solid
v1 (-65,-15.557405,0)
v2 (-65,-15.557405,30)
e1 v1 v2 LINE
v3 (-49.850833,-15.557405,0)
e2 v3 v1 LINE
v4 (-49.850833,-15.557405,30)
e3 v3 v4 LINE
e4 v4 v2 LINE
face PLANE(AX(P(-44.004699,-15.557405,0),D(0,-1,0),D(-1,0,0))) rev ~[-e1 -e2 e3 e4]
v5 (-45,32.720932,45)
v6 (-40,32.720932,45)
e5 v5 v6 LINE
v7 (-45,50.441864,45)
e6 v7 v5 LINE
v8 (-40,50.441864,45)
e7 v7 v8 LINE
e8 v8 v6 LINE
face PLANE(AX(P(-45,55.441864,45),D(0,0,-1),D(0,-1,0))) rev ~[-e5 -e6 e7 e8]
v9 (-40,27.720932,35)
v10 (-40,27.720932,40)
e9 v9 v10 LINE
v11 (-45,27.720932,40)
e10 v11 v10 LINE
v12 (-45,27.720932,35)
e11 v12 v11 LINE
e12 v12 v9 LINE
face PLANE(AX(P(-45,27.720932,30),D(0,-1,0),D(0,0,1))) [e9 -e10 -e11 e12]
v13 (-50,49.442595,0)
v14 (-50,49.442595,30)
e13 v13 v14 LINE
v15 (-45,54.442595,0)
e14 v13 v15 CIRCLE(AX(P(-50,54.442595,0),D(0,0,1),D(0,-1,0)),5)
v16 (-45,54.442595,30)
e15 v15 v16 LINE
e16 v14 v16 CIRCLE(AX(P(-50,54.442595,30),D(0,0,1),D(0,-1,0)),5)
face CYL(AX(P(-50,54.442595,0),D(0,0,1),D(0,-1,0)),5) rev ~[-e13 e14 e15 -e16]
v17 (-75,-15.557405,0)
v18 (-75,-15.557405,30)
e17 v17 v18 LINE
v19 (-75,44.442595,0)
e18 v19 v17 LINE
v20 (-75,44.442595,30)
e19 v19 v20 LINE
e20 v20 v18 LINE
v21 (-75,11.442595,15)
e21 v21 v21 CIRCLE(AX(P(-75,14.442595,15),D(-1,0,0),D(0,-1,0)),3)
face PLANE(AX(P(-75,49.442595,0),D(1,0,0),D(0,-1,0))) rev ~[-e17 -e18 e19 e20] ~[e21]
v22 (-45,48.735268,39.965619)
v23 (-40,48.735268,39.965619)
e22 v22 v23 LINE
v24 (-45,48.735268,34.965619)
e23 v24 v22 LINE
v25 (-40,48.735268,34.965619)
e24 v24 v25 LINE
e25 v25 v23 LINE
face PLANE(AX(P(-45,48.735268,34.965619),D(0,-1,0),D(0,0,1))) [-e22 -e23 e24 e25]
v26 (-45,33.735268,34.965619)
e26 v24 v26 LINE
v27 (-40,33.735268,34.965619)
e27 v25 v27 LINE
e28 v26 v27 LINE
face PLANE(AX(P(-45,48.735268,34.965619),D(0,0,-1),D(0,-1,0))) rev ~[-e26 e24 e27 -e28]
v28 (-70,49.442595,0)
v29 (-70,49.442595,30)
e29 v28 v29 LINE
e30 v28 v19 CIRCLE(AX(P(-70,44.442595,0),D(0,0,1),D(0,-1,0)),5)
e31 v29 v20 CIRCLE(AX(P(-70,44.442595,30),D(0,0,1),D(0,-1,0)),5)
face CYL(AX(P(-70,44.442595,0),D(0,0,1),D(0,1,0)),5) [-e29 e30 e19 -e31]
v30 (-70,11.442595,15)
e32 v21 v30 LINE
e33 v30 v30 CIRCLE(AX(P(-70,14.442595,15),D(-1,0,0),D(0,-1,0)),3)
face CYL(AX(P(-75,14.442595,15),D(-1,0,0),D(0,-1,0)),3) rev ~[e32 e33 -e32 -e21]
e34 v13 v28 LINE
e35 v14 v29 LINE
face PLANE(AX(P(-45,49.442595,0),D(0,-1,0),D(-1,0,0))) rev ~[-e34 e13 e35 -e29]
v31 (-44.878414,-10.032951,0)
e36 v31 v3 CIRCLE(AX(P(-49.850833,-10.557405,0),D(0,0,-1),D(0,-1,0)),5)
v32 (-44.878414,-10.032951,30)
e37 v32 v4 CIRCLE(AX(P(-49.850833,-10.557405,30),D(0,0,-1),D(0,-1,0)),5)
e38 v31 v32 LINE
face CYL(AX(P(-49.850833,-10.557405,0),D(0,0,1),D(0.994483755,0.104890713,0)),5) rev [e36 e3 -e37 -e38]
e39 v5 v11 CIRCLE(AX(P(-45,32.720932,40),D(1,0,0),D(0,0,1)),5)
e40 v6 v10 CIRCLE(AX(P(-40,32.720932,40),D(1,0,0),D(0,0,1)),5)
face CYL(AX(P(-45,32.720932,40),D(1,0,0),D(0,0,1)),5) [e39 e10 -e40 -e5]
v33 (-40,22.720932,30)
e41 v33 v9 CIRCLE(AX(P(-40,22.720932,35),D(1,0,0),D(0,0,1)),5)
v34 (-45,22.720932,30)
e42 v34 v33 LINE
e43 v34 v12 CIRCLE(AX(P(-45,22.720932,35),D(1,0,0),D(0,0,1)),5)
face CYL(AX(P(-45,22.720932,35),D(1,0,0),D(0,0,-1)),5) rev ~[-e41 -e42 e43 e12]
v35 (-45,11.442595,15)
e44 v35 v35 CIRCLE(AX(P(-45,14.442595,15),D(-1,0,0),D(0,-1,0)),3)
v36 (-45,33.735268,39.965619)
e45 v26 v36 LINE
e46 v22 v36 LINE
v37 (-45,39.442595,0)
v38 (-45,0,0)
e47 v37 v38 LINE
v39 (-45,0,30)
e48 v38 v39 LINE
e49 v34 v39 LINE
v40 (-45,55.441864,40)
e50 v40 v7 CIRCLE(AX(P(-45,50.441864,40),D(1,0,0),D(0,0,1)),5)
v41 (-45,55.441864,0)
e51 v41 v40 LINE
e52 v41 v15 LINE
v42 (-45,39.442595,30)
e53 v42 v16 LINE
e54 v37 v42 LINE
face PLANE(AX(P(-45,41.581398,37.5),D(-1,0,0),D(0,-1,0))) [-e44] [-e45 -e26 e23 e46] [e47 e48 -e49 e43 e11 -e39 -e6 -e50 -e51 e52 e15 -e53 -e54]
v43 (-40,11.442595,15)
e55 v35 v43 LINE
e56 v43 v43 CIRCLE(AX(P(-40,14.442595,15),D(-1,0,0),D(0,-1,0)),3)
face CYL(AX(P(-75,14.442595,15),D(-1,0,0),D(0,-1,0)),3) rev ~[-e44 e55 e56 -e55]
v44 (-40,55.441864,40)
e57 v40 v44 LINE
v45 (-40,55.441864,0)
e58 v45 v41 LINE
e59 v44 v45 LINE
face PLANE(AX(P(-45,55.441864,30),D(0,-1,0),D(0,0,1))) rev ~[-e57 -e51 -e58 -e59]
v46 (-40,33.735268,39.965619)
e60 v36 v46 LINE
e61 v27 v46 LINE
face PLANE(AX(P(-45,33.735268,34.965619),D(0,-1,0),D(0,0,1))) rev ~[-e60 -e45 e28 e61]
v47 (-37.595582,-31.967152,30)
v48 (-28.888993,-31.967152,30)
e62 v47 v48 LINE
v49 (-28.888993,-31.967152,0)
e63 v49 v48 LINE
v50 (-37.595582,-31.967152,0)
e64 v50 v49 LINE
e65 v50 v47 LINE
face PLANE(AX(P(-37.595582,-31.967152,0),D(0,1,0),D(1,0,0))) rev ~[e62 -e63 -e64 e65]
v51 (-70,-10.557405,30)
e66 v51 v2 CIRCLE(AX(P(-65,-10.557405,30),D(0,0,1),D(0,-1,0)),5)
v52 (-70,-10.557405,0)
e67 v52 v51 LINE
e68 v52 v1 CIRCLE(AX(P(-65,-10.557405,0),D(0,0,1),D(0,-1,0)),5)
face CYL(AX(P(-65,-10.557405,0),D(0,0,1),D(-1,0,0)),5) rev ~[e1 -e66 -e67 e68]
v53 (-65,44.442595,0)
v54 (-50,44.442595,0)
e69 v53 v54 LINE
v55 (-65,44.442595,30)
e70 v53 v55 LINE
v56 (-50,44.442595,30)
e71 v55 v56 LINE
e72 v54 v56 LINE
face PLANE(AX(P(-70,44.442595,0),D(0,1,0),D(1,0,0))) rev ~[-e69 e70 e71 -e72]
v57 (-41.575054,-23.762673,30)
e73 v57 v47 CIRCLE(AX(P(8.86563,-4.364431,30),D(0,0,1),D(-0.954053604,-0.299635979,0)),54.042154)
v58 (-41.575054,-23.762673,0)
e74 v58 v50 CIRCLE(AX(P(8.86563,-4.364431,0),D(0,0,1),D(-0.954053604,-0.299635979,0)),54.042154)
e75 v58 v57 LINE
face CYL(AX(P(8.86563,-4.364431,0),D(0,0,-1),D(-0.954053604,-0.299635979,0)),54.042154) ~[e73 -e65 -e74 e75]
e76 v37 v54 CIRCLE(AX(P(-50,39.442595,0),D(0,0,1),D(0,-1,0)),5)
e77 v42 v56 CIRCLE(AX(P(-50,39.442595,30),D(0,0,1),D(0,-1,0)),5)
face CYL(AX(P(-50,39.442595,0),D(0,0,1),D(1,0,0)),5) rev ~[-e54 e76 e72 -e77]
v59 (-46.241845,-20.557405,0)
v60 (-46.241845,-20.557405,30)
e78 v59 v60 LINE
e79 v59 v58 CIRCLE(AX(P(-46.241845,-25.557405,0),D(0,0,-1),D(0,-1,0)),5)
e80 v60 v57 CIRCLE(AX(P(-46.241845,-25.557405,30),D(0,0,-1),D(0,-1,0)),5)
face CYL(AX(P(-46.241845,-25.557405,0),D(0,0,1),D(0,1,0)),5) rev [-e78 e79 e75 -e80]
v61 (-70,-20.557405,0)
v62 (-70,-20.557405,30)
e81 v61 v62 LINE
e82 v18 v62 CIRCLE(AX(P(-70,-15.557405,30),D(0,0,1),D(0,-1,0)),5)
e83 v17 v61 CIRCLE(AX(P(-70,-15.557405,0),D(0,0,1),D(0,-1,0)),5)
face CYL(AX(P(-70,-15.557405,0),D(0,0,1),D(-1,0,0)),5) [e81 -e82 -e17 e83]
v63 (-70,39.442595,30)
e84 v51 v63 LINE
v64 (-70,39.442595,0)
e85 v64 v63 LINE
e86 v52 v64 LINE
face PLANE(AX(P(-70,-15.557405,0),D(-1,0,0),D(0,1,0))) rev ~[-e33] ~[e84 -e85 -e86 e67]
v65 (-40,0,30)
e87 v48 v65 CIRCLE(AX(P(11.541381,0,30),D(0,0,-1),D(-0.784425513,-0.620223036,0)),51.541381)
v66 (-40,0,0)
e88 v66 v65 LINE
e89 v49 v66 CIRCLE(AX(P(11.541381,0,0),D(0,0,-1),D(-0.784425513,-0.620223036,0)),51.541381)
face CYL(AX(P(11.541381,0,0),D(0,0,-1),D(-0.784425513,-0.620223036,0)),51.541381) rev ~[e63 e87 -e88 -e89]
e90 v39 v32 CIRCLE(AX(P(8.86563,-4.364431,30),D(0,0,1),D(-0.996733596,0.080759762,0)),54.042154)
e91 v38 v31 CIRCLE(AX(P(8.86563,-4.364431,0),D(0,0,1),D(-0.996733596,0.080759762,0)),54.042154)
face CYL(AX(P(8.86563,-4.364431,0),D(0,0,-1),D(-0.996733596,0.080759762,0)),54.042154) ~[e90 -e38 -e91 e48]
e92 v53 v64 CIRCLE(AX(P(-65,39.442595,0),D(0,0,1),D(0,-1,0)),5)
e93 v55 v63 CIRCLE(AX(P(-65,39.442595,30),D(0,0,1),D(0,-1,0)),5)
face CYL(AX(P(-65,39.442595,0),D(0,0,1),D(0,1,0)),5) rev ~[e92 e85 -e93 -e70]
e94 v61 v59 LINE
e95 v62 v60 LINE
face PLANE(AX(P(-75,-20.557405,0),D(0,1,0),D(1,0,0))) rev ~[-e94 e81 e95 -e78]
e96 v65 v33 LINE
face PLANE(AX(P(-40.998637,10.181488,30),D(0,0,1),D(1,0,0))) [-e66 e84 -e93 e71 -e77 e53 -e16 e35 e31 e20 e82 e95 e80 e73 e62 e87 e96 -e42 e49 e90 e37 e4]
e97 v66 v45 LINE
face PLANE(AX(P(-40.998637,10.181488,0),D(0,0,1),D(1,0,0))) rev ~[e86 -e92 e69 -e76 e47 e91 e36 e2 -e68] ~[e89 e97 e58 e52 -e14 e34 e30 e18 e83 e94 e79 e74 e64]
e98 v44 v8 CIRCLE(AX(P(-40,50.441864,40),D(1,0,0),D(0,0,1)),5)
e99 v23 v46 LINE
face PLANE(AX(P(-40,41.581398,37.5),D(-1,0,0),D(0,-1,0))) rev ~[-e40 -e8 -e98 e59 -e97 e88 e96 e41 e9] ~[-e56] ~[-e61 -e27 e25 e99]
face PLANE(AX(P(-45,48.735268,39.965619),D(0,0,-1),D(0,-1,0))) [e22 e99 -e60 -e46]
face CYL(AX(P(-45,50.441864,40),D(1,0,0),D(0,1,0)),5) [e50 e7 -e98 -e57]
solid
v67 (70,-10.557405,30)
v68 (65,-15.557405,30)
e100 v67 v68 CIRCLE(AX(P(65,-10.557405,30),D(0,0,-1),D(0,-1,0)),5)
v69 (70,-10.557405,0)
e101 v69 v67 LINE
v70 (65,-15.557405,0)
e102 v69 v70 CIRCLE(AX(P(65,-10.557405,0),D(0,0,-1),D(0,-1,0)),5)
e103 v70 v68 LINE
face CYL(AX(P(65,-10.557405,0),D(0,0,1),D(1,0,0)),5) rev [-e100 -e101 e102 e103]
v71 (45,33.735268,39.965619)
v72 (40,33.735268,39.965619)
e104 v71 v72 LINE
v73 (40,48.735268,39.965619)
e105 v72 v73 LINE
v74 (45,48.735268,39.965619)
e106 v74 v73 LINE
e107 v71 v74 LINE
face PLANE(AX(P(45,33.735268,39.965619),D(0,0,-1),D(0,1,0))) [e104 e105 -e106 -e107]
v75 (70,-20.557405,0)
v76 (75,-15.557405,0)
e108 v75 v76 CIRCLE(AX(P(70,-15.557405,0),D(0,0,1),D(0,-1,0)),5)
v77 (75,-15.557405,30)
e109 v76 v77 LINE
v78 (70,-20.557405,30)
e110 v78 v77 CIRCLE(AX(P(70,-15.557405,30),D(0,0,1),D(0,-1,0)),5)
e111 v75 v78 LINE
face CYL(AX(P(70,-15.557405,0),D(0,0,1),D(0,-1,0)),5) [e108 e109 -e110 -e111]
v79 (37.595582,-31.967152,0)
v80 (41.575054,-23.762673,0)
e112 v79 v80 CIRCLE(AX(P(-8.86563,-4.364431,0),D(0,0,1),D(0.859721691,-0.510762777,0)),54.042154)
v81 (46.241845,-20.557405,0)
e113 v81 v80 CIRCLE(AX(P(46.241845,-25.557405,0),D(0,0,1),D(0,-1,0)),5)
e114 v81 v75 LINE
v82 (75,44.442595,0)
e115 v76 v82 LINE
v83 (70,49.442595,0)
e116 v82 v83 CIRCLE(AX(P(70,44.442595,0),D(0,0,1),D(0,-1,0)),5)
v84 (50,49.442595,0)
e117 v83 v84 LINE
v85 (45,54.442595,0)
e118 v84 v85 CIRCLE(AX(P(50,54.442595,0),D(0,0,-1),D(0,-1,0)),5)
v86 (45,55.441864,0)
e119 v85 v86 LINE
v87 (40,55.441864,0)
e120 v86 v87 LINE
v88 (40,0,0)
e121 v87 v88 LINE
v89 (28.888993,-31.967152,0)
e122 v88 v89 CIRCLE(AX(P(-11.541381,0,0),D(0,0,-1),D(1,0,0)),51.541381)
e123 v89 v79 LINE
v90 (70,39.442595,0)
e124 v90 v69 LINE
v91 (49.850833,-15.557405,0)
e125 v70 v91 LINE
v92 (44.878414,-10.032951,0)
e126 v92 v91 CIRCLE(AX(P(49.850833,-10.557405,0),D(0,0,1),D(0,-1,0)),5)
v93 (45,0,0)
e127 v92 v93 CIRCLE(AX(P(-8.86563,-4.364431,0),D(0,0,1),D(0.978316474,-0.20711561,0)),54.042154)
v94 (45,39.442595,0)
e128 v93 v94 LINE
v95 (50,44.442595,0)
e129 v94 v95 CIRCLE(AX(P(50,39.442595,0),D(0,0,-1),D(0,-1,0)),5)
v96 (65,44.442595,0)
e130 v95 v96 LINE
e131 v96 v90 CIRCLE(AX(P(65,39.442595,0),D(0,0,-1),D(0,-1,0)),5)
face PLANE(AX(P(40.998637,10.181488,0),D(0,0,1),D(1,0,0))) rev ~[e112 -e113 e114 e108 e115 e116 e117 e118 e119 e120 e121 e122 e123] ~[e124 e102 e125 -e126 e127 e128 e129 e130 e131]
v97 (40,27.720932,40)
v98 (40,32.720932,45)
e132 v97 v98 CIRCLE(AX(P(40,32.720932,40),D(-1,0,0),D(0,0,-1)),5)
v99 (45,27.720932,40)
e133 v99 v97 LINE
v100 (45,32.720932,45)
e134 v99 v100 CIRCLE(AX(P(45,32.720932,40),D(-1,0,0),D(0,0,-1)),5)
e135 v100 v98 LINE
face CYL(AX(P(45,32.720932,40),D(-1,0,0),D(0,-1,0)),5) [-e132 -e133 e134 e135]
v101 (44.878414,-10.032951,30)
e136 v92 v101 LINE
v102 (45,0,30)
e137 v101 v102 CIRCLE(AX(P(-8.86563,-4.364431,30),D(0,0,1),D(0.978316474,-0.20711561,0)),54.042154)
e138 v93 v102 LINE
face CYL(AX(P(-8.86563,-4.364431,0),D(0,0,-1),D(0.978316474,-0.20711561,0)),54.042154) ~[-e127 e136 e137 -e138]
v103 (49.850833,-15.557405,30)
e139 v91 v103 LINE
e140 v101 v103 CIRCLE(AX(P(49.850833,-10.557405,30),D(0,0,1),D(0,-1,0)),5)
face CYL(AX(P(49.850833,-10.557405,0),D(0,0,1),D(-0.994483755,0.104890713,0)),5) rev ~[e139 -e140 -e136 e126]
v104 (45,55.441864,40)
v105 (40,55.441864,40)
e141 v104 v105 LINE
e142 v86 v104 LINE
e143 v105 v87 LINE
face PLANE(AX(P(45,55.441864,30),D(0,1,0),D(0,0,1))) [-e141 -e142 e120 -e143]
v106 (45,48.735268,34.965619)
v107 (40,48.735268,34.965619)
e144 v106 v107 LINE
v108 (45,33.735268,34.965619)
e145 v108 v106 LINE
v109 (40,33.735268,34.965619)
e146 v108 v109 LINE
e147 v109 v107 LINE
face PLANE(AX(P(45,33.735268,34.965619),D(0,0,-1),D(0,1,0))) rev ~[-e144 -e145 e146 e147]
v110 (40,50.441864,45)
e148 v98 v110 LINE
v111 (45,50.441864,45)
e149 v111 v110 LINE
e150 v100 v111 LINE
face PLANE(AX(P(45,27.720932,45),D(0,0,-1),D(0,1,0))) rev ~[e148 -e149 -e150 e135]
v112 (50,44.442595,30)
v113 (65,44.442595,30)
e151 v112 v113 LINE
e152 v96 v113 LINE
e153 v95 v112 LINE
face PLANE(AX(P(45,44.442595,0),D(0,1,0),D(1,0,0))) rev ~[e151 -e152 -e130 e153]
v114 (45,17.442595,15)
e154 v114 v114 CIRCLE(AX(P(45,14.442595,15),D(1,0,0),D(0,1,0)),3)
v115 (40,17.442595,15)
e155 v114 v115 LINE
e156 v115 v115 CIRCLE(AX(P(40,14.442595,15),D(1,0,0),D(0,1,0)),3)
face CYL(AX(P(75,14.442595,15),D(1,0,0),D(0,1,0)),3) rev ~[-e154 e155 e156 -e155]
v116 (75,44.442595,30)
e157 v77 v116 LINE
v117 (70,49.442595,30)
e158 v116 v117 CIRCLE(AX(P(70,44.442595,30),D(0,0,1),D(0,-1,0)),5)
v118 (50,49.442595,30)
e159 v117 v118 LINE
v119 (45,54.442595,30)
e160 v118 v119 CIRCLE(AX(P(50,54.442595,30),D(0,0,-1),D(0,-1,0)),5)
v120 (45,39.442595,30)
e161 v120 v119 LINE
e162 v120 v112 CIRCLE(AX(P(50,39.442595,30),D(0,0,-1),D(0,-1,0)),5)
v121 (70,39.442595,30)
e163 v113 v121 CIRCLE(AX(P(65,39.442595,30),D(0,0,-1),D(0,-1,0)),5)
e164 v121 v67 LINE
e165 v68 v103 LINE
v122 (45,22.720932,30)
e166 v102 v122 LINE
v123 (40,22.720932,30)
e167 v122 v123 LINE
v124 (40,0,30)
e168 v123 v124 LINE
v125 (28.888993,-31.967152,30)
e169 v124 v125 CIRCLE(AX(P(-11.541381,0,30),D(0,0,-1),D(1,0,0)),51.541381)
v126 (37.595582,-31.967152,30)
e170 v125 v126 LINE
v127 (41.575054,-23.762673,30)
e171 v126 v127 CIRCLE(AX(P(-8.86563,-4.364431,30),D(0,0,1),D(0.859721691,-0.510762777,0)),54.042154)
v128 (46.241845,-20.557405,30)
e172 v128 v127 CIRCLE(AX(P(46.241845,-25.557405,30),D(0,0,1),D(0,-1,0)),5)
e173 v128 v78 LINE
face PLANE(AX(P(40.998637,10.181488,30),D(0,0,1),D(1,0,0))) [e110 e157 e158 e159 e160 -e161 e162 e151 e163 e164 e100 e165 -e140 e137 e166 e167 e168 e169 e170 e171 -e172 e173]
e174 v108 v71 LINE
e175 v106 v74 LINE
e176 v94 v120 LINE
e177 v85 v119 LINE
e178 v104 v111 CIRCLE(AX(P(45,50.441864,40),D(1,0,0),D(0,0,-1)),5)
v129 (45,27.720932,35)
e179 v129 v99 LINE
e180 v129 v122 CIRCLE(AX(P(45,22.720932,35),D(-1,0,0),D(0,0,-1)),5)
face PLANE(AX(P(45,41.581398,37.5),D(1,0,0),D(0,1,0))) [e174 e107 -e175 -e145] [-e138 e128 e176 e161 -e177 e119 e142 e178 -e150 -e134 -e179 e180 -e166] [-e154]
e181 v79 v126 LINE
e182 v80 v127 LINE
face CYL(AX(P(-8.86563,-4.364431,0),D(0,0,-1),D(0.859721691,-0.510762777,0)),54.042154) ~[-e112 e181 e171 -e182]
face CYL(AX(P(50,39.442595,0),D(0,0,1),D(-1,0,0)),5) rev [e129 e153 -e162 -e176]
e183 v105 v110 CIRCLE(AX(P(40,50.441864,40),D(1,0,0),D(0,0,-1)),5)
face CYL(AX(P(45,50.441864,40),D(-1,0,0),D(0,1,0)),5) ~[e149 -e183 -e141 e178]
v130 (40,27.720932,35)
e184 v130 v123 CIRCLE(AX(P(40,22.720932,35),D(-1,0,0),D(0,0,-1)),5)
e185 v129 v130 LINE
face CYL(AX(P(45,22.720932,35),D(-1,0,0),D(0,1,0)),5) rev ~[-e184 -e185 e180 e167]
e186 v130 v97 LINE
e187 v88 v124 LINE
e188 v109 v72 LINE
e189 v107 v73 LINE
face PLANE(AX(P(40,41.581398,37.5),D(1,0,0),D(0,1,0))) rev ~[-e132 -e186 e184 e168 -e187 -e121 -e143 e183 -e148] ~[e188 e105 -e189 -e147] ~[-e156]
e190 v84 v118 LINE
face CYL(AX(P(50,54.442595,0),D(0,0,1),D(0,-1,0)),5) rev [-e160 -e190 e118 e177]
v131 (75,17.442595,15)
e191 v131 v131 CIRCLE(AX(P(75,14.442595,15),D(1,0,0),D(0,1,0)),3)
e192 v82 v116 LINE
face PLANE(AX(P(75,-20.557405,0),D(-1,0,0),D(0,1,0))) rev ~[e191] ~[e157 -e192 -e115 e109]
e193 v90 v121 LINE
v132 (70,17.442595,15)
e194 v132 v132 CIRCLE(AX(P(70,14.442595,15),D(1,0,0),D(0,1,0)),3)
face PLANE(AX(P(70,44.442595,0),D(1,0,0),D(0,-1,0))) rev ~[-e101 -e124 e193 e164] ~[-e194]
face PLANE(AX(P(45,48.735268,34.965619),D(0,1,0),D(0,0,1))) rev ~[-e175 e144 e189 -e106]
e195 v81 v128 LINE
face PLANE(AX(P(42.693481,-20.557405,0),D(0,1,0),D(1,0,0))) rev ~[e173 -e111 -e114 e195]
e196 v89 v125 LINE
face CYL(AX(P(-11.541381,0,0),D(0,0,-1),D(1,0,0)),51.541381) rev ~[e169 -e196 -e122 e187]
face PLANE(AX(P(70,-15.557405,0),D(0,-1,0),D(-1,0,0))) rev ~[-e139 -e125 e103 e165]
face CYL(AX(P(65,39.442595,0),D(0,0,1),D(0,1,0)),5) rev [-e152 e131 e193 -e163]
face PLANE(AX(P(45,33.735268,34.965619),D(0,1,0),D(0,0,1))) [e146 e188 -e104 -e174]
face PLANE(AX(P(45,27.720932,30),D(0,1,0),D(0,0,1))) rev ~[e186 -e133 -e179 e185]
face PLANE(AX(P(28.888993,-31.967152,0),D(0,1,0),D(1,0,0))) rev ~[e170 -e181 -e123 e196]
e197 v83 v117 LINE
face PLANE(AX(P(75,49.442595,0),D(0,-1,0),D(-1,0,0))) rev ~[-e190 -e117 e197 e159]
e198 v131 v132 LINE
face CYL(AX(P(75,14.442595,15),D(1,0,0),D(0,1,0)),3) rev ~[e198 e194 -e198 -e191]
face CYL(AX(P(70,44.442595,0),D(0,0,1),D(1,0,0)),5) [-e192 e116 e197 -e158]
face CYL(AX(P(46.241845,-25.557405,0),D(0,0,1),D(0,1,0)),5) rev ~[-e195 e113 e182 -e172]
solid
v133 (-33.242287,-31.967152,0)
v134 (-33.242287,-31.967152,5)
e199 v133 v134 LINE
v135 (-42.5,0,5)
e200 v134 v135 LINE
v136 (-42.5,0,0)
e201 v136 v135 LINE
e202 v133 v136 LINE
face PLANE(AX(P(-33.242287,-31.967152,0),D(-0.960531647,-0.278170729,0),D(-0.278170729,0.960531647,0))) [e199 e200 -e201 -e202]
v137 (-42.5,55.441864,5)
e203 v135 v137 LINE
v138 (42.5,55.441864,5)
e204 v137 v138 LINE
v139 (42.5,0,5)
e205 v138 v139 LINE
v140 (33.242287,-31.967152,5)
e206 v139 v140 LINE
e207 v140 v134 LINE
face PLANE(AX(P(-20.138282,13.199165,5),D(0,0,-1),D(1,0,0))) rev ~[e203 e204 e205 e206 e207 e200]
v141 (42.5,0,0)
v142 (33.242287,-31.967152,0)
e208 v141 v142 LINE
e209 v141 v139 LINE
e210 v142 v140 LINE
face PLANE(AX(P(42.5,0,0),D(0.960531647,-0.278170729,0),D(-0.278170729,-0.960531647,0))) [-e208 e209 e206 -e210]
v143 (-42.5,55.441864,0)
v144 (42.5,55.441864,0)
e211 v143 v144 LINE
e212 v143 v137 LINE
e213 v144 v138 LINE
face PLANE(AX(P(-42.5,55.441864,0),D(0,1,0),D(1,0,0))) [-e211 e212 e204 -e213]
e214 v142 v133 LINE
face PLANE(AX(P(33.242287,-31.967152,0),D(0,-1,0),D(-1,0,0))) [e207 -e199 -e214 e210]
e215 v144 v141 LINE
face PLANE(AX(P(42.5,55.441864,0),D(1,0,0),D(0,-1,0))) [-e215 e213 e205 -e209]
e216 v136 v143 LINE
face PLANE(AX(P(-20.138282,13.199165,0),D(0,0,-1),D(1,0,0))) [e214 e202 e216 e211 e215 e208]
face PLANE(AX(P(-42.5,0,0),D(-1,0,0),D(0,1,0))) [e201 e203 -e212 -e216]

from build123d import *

# Parameters (mm, degrees)
F1_DEPTH  = 30
F3_DEPTH  = 5
F4_R      = 3
F5_DEPTH  = 35
F6_R      = 3
F7_DEPTH  = 35
F9_W      = 27.7209319142
F9_H      = 15
F9_W_2    = 15
F9_H_2    = 5
F10_DEPTH = 5
F11_R     = 5
F12_R     = 5
F13_R     = 5
F13_2_R   = 5
F14_R     = 5
F15_W     = 27.7209319142
F15_H     = 15
F15_W_2   = 15
F15_H_2   = 5
F16_DEPTH = 5
F17_R     = 5


with BuildPart() as f1:
    # F0 (on Top) → F1 (new body)
    with BuildSketch(Plane.XY):
        with BuildLine():
            Line((-45, 44.4425949542), (-45, 0))
            ThreePointArc((-45, 0), (-45.066266446, -7.8147796829), (-44.0046991035, -15.5574050458))
            ThreePointArc((-44.0046991035, -15.5574050458), (-43.4089049923, -18.0730910814), (-42.6934813561, -20.5574050458))
            ThreePointArc((-42.6934813561, -20.5574050458), (-40.475443237, -26.4101305765), (-37.5955815851, -31.9671519101))
            Line((-37.5955815851, -31.9671519101), (-28.8889932035, -31.9671519101))
            ThreePointArc((-28.8889932035, -31.9671519101), (-37.1430686541, -16.9215341597), (-40, 0))
            Line((-40, 0), (-40, 55.4418638284))
            Line((-40, 55.4418638284), (-45, 55.4418638284))
            Line((-45, 55.4418638284), (-45, 49.4425949542))
            Line((-45, 49.4425949542), (-45, 44.4425949542))
        make_face()
        with BuildLine():
            ThreePointArc((-42.6934813561, -20.5574050458), (-43.4089049923, -18.0730910814), (-44.0046991035, -15.5574050458))
            Line((-44.0046991035, -15.5574050458), (-70, -15.5574050458))
            Line((-70, -15.5574050458), (-70, 44.4425949542))
            Line((-70, 44.4425949542), (-45, 44.4425949542))
            Line((-45, 44.4425949542), (-45, 49.4425949542))
            Line((-45, 49.4425949542), (-75, 49.4425949542))
            Line((-75, 49.4425949542), (-75, -20.5574050458))
            Line((-75, -20.5574050458), (-42.6934813561, -20.5574050458))
        make_face()
    extrude(amount=F1_DEPTH)

    # F6 (on face) → F7 (cut)
    with BuildSketch(Plane(origin=(-75, 0, 0), x_dir=(0, -1, 0), z_dir=(-1, 0, 0))):
        with Locations((-14.4425949542, 15)):
            Circle(F6_R)
    extrude(amount=-F7_DEPTH, mode=Mode.SUBTRACT)

    # F9 (on face) → F10 (join)
    with BuildSketch(Plane(origin=(-45, 0, 0), x_dir=(0, -1, 0), z_dir=(-1, 0, 0))):
        with Locations((-41.5813978713, 37.5)):
            Rectangle(F9_W, F9_H)
        with Locations((-41.235268414, 37.4656194448)):
            Rectangle(F9_W_2, F9_H_2, mode=Mode.SUBTRACT)
    extrude(amount=-F10_DEPTH)

    # F11
    f11_edges = [f1.edges().sort_by_distance(p)[0] for p in [
        (-75, 49.442595, 15),
        (-75, -20.557405, 15),
    ]]
    fillet(f11_edges, radius=F11_R)

    # F13
    f13_edges = [f1.edges().sort_by_distance(p)[0] for p in [
        (-70, 44.442595, 15),
        (-70, -15.557405, 15),
        (-45, 44.442595, 15),
        (-44.004699, -15.557405, 15),
        (-42.693481, -20.557405, 15),
        (-45, 49.442595, 15),
        (-42.5, 27.720932, 30),
    ]]
    fillet(f13_edges, radius=F13_R)

    # F14
    f14_edges = [f1.edges().sort_by_distance(p)[0] for p in [
        (-42.5, 55.441864, 45),
        (-42.5, 27.720932, 45),
    ]]
    fillet(f14_edges, radius=F14_R)


with BuildPart() as f1b:
    # F0 (on Top) → F1, piece 2 (new body)
    with BuildSketch(Plane.XY):
        with BuildLine():
            ThreePointArc((44.0046991035, -15.5574050458), (45.066266446, -7.8147796829), (45, 0))
            Line((45, 0), (45, 44.4425949542))
            Line((45, 44.4425949542), (45, 49.4425949542))
            Line((45, 49.4425949542), (45, 55.4418638284))
            Line((45, 55.4418638284), (40, 55.4418638284))
            Line((40, 55.4418638284), (40, 0))
            ThreePointArc((40, 0), (37.1430686541, -16.9215341597), (28.8889932035, -31.9671519101))
            Line((28.8889932035, -31.9671519101), (37.5955815851, -31.9671519101))
            ThreePointArc((37.5955815851, -31.9671519101), (40.475443237, -26.4101305765), (42.6934813561, -20.5574050458))
            ThreePointArc((42.6934813561, -20.5574050458), (43.4089049923, -18.0730910814), (44.0046991035, -15.5574050458))
        make_face()
        with BuildLine():
            Line((45, 49.4425949542), (45, 44.4425949542))
            Line((45, 44.4425949542), (70, 44.4425949542))
            Line((70, 44.4425949542), (70, -15.5574050458))
            Line((70, -15.5574050458), (44.0046991035, -15.5574050458))
            ThreePointArc((44.0046991035, -15.5574050458), (43.4089049923, -18.0730910814), (42.6934813561, -20.5574050458))
            Line((42.6934813561, -20.5574050458), (75, -20.5574050458))
            Line((75, -20.5574050458), (75, 49.4425949542))
            Line((75, 49.4425949542), (45, 49.4425949542))
        make_face()
    extrude(amount=F1_DEPTH)

    # F4 (on face) → F5 (cut)
    with BuildSketch(Plane.YZ.offset(75)):
        with Locations((14.4425949542, 15)):
            Circle(F4_R)
    extrude(amount=-F5_DEPTH, mode=Mode.SUBTRACT)

    # F12
    f12_edges = [f1b.edges().sort_by_distance(p)[0] for p in [
        (75, -20.557405, 15),
        (75, 49.442595, 15),
    ]]
    fillet(f12_edges, radius=F12_R)

    # F13#2
    f13_2_edges = [f1b.edges().sort_by_distance(p)[0] for p in [
        (70, 44.442595, 15),
        (70, -15.557405, 15),
        (45, 44.442595, 15),
        (44.004699, -15.557405, 15),
        (42.693481, -20.557405, 15),
        (45, 49.442595, 15),
    ]]
    fillet(f13_2_edges, radius=F13_2_R)

    # F15 (on face) → F16 (join)
    with BuildSketch(Plane.YZ.offset(45)):
        with Locations((41.5813978713, 37.5)):
            Rectangle(F15_W, F15_H)
        with Locations((41.235268414, 37.4656194448)):
            Rectangle(F15_W_2, F15_H_2, mode=Mode.SUBTRACT)
    extrude(amount=-F16_DEPTH)

    # F17
    f17_edges = [f1b.edges().sort_by_distance(p)[0] for p in [
        (42.5, 55.441864, 45),
        (42.5, 27.720932, 45),
        (42.5, 27.720932, 30),
    ]]
    fillet(f17_edges, radius=F17_R)


with BuildPart() as f3:
    # F2 (on face) → F3 (new body)
    with BuildSketch(Plane(origin=(0, 0, 0), x_dir=(1, 0, 0), z_dir=(0, 0, -1))):
        Polygon((-42.5, 0), (-42.5, -55.4418638284), (0, -55.4418638284), (0, 31.9671519101), (-33.2422873943, 31.9671519101), align=None)
        Polygon((0, 31.9671519101), (0, -55.4418638284), (42.5, -55.4418638284), (42.5, 0), (33.2422873943, 31.9671519101), align=None)
    extrude(amount=-F3_DEPTH)


solid = Compound([f1.part, f1b.part, f3.part])
